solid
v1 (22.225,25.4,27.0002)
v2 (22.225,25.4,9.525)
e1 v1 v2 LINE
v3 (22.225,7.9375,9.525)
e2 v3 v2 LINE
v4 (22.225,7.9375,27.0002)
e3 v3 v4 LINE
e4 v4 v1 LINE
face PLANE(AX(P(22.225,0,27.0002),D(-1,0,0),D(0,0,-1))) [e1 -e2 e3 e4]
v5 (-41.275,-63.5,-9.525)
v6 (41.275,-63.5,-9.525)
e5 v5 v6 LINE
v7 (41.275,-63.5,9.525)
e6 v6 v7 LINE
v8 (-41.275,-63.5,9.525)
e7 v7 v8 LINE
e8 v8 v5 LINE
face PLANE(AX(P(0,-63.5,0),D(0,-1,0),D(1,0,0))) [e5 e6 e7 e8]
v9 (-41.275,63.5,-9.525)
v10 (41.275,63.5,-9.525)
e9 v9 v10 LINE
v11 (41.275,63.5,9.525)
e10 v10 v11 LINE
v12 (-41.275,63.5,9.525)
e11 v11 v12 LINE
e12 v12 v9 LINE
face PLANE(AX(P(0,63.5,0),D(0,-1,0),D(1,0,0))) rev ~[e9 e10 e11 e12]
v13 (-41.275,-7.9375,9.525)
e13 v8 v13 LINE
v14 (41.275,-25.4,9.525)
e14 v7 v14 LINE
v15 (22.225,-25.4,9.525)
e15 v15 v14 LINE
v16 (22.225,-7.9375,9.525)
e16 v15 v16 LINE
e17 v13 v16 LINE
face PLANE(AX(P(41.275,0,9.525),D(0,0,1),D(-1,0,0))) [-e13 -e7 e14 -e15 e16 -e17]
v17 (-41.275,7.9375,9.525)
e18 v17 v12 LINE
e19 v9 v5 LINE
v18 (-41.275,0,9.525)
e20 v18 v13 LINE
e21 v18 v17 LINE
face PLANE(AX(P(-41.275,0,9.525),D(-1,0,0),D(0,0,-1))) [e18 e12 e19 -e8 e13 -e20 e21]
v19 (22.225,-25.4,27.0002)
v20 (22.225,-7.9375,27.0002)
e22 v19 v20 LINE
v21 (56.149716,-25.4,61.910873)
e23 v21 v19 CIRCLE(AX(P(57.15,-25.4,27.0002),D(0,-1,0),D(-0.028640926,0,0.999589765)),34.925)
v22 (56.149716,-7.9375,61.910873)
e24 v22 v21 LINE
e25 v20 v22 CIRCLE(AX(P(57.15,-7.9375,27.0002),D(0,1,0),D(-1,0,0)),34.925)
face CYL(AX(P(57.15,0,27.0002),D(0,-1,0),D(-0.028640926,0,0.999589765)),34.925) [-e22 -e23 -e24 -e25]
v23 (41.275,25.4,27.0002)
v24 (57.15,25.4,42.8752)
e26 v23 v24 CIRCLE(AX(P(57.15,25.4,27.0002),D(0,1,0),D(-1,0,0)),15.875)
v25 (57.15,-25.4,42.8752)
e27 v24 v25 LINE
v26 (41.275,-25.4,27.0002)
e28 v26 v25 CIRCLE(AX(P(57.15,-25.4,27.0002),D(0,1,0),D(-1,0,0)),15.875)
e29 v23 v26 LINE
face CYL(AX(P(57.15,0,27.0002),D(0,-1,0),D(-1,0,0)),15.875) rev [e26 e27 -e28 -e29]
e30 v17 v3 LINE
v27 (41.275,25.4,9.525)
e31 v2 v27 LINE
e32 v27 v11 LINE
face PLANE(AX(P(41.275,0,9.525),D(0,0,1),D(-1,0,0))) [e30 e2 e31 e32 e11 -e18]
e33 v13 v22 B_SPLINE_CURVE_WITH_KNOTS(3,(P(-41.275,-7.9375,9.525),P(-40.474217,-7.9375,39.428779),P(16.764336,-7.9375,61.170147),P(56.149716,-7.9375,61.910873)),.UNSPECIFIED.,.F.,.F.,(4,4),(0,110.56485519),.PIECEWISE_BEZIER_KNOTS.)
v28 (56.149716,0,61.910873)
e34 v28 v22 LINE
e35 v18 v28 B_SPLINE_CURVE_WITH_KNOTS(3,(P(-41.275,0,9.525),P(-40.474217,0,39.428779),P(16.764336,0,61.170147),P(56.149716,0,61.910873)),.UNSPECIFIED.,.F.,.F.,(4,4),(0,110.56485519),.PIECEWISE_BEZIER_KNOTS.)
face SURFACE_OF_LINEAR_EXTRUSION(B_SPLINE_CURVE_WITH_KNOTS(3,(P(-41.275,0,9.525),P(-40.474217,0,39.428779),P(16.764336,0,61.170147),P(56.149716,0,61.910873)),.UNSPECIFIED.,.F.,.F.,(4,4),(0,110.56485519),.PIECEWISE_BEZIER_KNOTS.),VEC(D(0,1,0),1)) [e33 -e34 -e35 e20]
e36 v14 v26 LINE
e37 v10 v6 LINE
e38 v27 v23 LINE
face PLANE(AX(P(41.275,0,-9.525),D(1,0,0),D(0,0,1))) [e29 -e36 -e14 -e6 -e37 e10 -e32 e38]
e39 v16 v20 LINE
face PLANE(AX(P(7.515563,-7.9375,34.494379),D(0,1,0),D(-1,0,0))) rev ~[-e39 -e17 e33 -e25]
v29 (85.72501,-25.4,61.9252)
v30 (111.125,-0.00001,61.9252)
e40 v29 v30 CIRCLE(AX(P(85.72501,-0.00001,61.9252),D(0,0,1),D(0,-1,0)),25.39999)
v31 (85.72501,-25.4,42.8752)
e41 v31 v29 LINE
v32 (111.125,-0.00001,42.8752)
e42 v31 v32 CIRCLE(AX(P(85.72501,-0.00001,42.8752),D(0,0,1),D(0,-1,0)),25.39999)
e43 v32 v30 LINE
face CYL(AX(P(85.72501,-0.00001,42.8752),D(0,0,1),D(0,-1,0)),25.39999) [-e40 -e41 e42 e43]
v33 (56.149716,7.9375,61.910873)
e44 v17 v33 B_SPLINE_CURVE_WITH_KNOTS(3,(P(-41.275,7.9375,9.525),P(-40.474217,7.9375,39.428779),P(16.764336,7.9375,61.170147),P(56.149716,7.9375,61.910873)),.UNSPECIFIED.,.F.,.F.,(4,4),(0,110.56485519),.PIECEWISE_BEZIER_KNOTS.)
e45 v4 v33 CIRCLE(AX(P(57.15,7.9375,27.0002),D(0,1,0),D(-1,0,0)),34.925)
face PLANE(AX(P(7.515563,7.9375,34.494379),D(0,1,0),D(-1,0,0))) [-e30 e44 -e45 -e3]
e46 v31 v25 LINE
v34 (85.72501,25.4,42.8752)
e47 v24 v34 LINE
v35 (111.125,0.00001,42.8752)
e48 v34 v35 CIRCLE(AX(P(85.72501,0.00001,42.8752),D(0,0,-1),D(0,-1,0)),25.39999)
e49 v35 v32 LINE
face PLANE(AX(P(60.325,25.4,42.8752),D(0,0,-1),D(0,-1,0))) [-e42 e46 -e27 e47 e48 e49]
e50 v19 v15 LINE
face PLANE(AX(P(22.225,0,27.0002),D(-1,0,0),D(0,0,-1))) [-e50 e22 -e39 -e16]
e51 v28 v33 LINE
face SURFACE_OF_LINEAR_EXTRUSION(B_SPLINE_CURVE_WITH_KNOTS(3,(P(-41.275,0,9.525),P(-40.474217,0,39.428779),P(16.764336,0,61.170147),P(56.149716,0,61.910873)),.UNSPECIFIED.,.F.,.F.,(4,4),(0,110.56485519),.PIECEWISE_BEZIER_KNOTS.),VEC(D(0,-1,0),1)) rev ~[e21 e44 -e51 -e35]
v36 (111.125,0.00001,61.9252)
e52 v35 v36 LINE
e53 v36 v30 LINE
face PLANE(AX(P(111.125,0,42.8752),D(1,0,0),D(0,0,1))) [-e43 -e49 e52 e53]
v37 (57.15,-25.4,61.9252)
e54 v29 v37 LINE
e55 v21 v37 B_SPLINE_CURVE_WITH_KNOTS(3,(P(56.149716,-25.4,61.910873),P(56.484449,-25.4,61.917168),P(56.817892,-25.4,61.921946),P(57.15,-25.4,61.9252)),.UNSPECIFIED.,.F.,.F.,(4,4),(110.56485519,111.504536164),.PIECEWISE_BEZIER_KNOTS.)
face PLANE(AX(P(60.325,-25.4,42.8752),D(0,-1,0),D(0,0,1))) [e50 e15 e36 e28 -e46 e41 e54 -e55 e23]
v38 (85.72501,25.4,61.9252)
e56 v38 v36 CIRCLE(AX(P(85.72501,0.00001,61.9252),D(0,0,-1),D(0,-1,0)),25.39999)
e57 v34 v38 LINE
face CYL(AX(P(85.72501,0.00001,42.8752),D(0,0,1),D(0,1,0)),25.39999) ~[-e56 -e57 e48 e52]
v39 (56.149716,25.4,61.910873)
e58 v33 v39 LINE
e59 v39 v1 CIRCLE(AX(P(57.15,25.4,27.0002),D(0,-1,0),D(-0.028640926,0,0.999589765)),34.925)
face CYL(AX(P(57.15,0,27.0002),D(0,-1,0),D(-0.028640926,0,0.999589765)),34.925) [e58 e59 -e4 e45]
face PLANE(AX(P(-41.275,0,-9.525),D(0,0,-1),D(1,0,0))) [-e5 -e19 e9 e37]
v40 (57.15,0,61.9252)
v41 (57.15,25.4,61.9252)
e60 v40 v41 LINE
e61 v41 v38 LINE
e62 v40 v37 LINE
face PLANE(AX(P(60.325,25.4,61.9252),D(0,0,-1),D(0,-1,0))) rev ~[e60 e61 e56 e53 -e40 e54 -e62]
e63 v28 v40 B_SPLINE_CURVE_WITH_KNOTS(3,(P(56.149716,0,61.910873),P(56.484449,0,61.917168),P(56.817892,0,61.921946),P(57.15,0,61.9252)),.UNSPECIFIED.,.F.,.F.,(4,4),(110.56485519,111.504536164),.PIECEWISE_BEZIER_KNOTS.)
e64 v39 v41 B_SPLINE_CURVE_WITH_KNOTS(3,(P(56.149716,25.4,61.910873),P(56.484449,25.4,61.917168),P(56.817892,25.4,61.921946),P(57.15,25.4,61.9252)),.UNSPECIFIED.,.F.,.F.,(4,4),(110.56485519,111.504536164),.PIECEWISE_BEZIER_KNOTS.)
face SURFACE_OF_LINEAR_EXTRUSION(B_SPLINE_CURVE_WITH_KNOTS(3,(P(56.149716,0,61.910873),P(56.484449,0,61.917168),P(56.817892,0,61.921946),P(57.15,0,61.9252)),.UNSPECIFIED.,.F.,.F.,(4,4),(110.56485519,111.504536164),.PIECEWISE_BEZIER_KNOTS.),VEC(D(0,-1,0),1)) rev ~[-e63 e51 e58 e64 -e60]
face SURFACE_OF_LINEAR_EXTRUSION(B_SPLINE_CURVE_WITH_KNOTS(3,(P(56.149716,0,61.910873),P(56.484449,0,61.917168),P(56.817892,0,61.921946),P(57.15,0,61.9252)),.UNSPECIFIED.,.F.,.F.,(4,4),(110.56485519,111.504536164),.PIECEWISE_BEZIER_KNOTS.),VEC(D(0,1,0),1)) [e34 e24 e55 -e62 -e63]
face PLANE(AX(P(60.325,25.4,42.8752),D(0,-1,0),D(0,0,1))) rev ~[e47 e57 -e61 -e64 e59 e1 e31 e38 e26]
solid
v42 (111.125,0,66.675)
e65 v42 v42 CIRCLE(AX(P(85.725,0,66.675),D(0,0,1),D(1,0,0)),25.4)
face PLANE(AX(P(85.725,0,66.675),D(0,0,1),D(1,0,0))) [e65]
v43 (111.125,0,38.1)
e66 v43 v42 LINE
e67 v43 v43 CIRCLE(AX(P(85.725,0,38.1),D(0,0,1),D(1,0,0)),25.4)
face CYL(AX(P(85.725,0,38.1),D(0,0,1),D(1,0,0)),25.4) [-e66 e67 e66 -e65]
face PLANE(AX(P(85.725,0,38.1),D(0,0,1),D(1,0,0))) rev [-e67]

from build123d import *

# Parameters (mm, degrees)
F1_DEPTH = 63.5
F2_DEPTH = 25.4
F3_DEPTH = 7.9375
F4_DEPTH = 50.8
F6_R     = 25.39999


# Not quite as in the source:
# - a fillet or chamfer is up to 0.001 mm smaller than in the source, because OpenCascade refuses the exact size


with BuildPart() as f1:
    # F0 (on Front) → F1 (new body, symmetric)
    with BuildSketch(Plane.XZ):
        Polygon((-41.275, 9.525), (-41.275, -9.525), (41.275, -9.525), (41.275, 9.525), (22.225, 9.525), align=None)
    extrude(amount=F1_DEPTH, both=True)

    # F0 (on Front) → F2 (join, symmetric)
    with BuildSketch(Plane.XZ):
        with BuildLine():
            Line((22.225, 9.525), (41.275, 9.525))
            Line((41.275, 9.525), (41.275, 27.0002))
            ThreePointArc((41.275, 27.0002), (45.9246798487, 38.2255201513), (57.15, 42.8752))
            Line((57.15, 42.8752), (60.325, 42.8752))
            Line((60.325, 42.8752), (60.325, 61.9252))
            Line((60.325, 61.9252), (57.15, 61.9252))
            add(Edge.make_bspline(
                [(56.1497156539, 61.9108725261), (56.4844485329, 61.9171678859), (56.8178918504, 61.9219463376), (57.15, 61.9252)],
                knots=[110.5648551898, 110.5648551898, 110.5648551898, 110.5648551898, 111.5045361635, 111.5045361635, 111.5045361635, 111.5045361635], degree=3))
            ThreePointArc((56.1497156539, 61.9108725261), (32.1031383624, 51.3396812415), (22.225, 27.0002))
            Line((22.225, 27.0002), (22.225, 9.525))
        make_face()
    extrude(amount=F2_DEPTH, both=True)

    # F0 (on Front) → F3 (join, symmetric)
    with BuildSketch(Plane.XZ):
        with BuildLine():
            add(Edge.make_bspline(
                [(-41.275, 9.525), (-40.4742170634, 39.4287788878), (16.7643355785, 61.1701471538), (56.1497156539, 61.9108725261)],
                knots=[0, 0, 0, 0, 110.5648551898, 110.5648551898, 110.5648551898, 110.5648551898], degree=3))
            Line((-41.275, 9.525), (22.225, 9.525))
            Line((22.225, 9.525), (22.225, 27.0002))
            ThreePointArc((22.225, 27.0002), (32.1031383624, 51.3396812415), (56.1497156539, 61.9108725261))
        make_face()
    extrude(amount=F3_DEPTH, both=True)

    # F4 (add): a face of the model
    f4_faces = [f1.faces().sort_by_distance(p)[0] for p in [
        (60.325, 0, 52.4002),
    ]]
    extrude(f4_faces, amount=F4_DEPTH)

    # F6 (radius 25.4 in the source; OpenCascade refuses exactly that, so slightly less here)
    f6_edges = [f1.edges().sort_by_distance(p)[0] for p in [
        (111.125, -25.4, 52.4002),
        (111.125, 25.4, 52.4002),
    ]]
    fillet(f6_edges, radius=F6_R)


with BuildPart() as f5:
    # F0 (on Front) → F5 (revolve)
    with BuildSketch(Plane.XZ):
        Polygon((85.725, 66.675), (85.725, 61.9252), (85.725, 42.8752), (85.725, 38.1), (111.125, 38.1), (111.125, 66.675), align=None)
    revolve(axis=Axis((85.725, 0, 52.3875), (0, 0, 1)))


solid = Compound([f1.part, f5.part])
